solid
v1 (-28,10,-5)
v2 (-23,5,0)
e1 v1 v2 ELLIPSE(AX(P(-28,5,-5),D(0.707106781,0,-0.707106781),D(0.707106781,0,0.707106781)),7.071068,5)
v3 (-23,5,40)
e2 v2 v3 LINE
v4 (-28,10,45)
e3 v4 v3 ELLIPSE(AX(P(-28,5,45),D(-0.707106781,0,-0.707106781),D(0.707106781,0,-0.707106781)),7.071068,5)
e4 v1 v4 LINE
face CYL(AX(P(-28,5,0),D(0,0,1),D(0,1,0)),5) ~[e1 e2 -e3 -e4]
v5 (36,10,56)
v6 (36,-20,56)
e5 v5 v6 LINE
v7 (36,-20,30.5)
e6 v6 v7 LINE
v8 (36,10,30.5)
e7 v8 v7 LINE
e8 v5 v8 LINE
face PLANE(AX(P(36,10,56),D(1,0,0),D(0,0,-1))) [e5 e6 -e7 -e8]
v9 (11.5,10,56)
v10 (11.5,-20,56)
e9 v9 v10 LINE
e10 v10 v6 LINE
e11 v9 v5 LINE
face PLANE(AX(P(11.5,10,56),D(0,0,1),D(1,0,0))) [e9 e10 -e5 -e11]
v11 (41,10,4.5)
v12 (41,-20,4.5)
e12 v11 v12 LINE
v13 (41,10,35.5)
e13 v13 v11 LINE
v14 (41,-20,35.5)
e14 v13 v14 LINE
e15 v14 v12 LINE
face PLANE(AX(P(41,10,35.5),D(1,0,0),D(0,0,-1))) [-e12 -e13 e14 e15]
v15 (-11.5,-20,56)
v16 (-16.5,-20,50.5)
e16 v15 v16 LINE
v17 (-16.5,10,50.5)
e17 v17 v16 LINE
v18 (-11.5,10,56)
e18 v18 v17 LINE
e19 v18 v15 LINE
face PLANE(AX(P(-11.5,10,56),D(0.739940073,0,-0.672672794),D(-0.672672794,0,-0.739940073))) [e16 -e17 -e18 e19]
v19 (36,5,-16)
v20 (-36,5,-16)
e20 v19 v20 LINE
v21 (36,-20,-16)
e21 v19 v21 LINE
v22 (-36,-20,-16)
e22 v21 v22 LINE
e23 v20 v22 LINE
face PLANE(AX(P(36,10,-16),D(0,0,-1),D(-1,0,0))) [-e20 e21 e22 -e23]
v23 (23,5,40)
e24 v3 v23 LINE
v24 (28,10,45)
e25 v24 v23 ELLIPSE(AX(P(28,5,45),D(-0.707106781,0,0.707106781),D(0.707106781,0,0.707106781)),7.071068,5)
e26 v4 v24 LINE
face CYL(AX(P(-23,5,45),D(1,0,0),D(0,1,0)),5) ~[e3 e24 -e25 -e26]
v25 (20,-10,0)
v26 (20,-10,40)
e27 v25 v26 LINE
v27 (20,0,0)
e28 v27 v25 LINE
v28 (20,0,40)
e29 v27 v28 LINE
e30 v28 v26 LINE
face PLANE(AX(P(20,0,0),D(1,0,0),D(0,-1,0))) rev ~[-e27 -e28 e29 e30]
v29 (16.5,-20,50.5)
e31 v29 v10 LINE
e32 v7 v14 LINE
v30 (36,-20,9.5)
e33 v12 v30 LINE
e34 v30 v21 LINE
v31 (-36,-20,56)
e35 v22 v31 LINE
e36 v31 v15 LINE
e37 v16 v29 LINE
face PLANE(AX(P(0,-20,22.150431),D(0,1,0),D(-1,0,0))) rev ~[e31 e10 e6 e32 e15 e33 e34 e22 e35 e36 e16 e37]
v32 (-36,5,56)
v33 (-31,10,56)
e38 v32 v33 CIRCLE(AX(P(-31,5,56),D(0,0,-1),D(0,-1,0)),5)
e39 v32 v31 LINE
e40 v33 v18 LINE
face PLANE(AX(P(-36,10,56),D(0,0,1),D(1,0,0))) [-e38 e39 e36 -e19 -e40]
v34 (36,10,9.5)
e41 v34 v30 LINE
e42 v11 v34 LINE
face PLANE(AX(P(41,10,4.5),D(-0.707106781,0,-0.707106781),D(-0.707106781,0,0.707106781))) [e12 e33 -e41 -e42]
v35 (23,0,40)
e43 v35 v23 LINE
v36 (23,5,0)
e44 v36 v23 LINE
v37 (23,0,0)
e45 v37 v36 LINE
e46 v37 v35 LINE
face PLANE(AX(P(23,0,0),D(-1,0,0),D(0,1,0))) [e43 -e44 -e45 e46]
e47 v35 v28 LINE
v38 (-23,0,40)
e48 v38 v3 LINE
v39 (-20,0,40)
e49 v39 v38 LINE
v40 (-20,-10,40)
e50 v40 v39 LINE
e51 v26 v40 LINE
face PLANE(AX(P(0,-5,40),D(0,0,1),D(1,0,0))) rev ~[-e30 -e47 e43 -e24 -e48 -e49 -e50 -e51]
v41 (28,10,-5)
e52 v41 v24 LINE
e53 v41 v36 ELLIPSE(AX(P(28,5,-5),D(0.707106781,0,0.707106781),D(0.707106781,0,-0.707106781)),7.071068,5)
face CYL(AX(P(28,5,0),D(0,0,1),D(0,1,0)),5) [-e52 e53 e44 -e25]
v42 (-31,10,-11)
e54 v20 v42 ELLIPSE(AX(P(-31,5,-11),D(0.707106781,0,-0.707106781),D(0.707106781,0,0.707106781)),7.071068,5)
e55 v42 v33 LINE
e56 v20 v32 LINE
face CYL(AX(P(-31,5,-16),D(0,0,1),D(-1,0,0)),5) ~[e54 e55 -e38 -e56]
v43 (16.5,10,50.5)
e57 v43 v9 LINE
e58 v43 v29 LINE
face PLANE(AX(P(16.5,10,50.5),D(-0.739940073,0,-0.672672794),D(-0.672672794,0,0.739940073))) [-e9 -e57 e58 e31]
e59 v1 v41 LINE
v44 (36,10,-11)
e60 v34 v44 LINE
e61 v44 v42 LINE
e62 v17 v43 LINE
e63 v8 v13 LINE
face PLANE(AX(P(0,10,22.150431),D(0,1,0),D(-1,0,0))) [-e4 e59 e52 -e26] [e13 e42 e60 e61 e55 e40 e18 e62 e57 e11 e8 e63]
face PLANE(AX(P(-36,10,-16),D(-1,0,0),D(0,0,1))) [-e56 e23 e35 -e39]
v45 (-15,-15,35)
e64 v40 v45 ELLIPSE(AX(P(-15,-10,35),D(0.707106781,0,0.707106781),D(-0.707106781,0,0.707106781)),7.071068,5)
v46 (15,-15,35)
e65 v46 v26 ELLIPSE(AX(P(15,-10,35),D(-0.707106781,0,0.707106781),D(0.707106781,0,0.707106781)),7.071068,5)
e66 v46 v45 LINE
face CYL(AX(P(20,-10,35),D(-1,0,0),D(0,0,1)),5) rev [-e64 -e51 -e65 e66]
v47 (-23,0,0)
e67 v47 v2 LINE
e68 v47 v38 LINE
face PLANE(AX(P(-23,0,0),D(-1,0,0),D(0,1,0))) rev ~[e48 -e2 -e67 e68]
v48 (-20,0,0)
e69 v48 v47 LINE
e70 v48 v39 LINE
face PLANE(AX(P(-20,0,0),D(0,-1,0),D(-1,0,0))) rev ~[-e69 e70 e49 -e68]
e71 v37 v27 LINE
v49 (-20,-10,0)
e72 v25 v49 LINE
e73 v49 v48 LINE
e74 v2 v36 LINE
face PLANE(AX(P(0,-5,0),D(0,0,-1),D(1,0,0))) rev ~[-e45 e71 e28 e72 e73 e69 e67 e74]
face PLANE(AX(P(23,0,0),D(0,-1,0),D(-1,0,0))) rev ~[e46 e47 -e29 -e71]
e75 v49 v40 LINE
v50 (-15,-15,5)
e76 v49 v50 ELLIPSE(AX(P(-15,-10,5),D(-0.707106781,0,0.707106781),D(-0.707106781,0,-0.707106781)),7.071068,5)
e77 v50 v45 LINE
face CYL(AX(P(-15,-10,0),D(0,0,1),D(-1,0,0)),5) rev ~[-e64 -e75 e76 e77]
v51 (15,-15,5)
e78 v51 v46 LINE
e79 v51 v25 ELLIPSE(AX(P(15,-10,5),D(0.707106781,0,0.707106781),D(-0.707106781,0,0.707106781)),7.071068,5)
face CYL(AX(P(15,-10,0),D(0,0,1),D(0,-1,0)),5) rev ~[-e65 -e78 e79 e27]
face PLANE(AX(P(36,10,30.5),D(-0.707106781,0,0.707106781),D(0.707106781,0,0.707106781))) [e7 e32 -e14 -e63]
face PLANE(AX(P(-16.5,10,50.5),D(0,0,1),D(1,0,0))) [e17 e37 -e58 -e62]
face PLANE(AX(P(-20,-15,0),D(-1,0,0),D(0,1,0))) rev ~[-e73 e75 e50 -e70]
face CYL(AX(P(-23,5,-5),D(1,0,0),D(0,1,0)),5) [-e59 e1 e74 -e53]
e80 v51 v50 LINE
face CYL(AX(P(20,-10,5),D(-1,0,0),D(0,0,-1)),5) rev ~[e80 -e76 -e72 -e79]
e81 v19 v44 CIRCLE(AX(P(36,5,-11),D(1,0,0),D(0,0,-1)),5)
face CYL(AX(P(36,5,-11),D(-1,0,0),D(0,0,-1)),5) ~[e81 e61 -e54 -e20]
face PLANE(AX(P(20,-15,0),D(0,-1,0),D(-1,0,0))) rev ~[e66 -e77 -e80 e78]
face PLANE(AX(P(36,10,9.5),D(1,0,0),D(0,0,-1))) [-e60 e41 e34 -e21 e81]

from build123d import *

# Parameters (mm, degrees)
F0_W     = 2
F0_H     = 10
F1_DEPTH = 40
F2_W     = 50
F2_H     = 30
F3_DEPTH = 5
F4_W     = 50
F4_H     = 30
F5_DEPTH = 5
F6_W     = 50
F6_H     = 50
F7_DEPTH = 30
F8_R     = 5
F9_R     = 5


# Not quite as in the source:
# - a feature names something its author has since deleted; it is built from what else it names


with BuildPart() as f1:
    # F0 (on Top) → F1 (new body)
    with BuildSketch(Plane.XY):
        with Locations((-24, 5)):
            Rectangle(F0_W, F0_H)
        with Locations((24, 5)):
            Rectangle(F0_W, F0_H)
        Polygon((-25, 0), (-25, -20), (25, -20), (25, 0), (23, 0), (20, 0), (20, -15), (-20, -15), (-20, 0), (-23, 0), align=None)
    extrude(amount=F1_DEPTH)

    # F2 (on face) → F3 (join)
    with BuildSketch(Plane.XY.offset(40)):
        with Locations((0, -5)):
            Rectangle(F2_W, F2_H)
    extrude(amount=F3_DEPTH)

    # F4 (on face) → F5 (join)
    with BuildSketch(Plane(origin=(0, 0, 0), x_dir=(1, 0, 0), z_dir=(0, 0, -1))):
        with Locations((0, 5)):
            Rectangle(F4_W, F4_H)
    extrude(amount=F5_DEPTH)

    # F6 (on face) → F7 (join)
    with BuildSketch(Plane(origin=(0, 10, 0), x_dir=(-1, 0, 0), z_dir=(0, 1, 0))):
        Polygon((-36, 9.5), (-36, -16), (36, -16), (36, 56), (11.5, 56), (16.5, 50.5), (-16.5, 50.5), (-11.5, 56), (-36, 56), (-36, 30.5), align=None)
        with Locations((0, 20)):
            Rectangle(F6_W, F6_H, mode=Mode.SUBTRACT)
        Polygon((-41, 4.5), (-36, 9.5), (-36, 30.5), (-41, 35.5), align=None)
    extrude(amount=-F7_DEPTH)

    # F8
    f8_edges = [f1.edges().sort_by_distance(p)[0] for p in [
        (0, 10, 0),
        (23, 10, 20),
        (0, 10, 40),
        (-23, 10, 20),
        (-36, 10, 20),
        (0, 10, -16),
    ]]
    fillet(f8_edges, radius=F8_R)

    # F9
    f9_edges = [f1.edges().sort_by_distance(p)[0] for p in [
        (20, -15, 20),
        (0, -15, 0),
        (0, -15, 40),
        (-20, -15, 20),
    ]]
    fillet(f9_edges, radius=F9_R)


solid = f1.part
